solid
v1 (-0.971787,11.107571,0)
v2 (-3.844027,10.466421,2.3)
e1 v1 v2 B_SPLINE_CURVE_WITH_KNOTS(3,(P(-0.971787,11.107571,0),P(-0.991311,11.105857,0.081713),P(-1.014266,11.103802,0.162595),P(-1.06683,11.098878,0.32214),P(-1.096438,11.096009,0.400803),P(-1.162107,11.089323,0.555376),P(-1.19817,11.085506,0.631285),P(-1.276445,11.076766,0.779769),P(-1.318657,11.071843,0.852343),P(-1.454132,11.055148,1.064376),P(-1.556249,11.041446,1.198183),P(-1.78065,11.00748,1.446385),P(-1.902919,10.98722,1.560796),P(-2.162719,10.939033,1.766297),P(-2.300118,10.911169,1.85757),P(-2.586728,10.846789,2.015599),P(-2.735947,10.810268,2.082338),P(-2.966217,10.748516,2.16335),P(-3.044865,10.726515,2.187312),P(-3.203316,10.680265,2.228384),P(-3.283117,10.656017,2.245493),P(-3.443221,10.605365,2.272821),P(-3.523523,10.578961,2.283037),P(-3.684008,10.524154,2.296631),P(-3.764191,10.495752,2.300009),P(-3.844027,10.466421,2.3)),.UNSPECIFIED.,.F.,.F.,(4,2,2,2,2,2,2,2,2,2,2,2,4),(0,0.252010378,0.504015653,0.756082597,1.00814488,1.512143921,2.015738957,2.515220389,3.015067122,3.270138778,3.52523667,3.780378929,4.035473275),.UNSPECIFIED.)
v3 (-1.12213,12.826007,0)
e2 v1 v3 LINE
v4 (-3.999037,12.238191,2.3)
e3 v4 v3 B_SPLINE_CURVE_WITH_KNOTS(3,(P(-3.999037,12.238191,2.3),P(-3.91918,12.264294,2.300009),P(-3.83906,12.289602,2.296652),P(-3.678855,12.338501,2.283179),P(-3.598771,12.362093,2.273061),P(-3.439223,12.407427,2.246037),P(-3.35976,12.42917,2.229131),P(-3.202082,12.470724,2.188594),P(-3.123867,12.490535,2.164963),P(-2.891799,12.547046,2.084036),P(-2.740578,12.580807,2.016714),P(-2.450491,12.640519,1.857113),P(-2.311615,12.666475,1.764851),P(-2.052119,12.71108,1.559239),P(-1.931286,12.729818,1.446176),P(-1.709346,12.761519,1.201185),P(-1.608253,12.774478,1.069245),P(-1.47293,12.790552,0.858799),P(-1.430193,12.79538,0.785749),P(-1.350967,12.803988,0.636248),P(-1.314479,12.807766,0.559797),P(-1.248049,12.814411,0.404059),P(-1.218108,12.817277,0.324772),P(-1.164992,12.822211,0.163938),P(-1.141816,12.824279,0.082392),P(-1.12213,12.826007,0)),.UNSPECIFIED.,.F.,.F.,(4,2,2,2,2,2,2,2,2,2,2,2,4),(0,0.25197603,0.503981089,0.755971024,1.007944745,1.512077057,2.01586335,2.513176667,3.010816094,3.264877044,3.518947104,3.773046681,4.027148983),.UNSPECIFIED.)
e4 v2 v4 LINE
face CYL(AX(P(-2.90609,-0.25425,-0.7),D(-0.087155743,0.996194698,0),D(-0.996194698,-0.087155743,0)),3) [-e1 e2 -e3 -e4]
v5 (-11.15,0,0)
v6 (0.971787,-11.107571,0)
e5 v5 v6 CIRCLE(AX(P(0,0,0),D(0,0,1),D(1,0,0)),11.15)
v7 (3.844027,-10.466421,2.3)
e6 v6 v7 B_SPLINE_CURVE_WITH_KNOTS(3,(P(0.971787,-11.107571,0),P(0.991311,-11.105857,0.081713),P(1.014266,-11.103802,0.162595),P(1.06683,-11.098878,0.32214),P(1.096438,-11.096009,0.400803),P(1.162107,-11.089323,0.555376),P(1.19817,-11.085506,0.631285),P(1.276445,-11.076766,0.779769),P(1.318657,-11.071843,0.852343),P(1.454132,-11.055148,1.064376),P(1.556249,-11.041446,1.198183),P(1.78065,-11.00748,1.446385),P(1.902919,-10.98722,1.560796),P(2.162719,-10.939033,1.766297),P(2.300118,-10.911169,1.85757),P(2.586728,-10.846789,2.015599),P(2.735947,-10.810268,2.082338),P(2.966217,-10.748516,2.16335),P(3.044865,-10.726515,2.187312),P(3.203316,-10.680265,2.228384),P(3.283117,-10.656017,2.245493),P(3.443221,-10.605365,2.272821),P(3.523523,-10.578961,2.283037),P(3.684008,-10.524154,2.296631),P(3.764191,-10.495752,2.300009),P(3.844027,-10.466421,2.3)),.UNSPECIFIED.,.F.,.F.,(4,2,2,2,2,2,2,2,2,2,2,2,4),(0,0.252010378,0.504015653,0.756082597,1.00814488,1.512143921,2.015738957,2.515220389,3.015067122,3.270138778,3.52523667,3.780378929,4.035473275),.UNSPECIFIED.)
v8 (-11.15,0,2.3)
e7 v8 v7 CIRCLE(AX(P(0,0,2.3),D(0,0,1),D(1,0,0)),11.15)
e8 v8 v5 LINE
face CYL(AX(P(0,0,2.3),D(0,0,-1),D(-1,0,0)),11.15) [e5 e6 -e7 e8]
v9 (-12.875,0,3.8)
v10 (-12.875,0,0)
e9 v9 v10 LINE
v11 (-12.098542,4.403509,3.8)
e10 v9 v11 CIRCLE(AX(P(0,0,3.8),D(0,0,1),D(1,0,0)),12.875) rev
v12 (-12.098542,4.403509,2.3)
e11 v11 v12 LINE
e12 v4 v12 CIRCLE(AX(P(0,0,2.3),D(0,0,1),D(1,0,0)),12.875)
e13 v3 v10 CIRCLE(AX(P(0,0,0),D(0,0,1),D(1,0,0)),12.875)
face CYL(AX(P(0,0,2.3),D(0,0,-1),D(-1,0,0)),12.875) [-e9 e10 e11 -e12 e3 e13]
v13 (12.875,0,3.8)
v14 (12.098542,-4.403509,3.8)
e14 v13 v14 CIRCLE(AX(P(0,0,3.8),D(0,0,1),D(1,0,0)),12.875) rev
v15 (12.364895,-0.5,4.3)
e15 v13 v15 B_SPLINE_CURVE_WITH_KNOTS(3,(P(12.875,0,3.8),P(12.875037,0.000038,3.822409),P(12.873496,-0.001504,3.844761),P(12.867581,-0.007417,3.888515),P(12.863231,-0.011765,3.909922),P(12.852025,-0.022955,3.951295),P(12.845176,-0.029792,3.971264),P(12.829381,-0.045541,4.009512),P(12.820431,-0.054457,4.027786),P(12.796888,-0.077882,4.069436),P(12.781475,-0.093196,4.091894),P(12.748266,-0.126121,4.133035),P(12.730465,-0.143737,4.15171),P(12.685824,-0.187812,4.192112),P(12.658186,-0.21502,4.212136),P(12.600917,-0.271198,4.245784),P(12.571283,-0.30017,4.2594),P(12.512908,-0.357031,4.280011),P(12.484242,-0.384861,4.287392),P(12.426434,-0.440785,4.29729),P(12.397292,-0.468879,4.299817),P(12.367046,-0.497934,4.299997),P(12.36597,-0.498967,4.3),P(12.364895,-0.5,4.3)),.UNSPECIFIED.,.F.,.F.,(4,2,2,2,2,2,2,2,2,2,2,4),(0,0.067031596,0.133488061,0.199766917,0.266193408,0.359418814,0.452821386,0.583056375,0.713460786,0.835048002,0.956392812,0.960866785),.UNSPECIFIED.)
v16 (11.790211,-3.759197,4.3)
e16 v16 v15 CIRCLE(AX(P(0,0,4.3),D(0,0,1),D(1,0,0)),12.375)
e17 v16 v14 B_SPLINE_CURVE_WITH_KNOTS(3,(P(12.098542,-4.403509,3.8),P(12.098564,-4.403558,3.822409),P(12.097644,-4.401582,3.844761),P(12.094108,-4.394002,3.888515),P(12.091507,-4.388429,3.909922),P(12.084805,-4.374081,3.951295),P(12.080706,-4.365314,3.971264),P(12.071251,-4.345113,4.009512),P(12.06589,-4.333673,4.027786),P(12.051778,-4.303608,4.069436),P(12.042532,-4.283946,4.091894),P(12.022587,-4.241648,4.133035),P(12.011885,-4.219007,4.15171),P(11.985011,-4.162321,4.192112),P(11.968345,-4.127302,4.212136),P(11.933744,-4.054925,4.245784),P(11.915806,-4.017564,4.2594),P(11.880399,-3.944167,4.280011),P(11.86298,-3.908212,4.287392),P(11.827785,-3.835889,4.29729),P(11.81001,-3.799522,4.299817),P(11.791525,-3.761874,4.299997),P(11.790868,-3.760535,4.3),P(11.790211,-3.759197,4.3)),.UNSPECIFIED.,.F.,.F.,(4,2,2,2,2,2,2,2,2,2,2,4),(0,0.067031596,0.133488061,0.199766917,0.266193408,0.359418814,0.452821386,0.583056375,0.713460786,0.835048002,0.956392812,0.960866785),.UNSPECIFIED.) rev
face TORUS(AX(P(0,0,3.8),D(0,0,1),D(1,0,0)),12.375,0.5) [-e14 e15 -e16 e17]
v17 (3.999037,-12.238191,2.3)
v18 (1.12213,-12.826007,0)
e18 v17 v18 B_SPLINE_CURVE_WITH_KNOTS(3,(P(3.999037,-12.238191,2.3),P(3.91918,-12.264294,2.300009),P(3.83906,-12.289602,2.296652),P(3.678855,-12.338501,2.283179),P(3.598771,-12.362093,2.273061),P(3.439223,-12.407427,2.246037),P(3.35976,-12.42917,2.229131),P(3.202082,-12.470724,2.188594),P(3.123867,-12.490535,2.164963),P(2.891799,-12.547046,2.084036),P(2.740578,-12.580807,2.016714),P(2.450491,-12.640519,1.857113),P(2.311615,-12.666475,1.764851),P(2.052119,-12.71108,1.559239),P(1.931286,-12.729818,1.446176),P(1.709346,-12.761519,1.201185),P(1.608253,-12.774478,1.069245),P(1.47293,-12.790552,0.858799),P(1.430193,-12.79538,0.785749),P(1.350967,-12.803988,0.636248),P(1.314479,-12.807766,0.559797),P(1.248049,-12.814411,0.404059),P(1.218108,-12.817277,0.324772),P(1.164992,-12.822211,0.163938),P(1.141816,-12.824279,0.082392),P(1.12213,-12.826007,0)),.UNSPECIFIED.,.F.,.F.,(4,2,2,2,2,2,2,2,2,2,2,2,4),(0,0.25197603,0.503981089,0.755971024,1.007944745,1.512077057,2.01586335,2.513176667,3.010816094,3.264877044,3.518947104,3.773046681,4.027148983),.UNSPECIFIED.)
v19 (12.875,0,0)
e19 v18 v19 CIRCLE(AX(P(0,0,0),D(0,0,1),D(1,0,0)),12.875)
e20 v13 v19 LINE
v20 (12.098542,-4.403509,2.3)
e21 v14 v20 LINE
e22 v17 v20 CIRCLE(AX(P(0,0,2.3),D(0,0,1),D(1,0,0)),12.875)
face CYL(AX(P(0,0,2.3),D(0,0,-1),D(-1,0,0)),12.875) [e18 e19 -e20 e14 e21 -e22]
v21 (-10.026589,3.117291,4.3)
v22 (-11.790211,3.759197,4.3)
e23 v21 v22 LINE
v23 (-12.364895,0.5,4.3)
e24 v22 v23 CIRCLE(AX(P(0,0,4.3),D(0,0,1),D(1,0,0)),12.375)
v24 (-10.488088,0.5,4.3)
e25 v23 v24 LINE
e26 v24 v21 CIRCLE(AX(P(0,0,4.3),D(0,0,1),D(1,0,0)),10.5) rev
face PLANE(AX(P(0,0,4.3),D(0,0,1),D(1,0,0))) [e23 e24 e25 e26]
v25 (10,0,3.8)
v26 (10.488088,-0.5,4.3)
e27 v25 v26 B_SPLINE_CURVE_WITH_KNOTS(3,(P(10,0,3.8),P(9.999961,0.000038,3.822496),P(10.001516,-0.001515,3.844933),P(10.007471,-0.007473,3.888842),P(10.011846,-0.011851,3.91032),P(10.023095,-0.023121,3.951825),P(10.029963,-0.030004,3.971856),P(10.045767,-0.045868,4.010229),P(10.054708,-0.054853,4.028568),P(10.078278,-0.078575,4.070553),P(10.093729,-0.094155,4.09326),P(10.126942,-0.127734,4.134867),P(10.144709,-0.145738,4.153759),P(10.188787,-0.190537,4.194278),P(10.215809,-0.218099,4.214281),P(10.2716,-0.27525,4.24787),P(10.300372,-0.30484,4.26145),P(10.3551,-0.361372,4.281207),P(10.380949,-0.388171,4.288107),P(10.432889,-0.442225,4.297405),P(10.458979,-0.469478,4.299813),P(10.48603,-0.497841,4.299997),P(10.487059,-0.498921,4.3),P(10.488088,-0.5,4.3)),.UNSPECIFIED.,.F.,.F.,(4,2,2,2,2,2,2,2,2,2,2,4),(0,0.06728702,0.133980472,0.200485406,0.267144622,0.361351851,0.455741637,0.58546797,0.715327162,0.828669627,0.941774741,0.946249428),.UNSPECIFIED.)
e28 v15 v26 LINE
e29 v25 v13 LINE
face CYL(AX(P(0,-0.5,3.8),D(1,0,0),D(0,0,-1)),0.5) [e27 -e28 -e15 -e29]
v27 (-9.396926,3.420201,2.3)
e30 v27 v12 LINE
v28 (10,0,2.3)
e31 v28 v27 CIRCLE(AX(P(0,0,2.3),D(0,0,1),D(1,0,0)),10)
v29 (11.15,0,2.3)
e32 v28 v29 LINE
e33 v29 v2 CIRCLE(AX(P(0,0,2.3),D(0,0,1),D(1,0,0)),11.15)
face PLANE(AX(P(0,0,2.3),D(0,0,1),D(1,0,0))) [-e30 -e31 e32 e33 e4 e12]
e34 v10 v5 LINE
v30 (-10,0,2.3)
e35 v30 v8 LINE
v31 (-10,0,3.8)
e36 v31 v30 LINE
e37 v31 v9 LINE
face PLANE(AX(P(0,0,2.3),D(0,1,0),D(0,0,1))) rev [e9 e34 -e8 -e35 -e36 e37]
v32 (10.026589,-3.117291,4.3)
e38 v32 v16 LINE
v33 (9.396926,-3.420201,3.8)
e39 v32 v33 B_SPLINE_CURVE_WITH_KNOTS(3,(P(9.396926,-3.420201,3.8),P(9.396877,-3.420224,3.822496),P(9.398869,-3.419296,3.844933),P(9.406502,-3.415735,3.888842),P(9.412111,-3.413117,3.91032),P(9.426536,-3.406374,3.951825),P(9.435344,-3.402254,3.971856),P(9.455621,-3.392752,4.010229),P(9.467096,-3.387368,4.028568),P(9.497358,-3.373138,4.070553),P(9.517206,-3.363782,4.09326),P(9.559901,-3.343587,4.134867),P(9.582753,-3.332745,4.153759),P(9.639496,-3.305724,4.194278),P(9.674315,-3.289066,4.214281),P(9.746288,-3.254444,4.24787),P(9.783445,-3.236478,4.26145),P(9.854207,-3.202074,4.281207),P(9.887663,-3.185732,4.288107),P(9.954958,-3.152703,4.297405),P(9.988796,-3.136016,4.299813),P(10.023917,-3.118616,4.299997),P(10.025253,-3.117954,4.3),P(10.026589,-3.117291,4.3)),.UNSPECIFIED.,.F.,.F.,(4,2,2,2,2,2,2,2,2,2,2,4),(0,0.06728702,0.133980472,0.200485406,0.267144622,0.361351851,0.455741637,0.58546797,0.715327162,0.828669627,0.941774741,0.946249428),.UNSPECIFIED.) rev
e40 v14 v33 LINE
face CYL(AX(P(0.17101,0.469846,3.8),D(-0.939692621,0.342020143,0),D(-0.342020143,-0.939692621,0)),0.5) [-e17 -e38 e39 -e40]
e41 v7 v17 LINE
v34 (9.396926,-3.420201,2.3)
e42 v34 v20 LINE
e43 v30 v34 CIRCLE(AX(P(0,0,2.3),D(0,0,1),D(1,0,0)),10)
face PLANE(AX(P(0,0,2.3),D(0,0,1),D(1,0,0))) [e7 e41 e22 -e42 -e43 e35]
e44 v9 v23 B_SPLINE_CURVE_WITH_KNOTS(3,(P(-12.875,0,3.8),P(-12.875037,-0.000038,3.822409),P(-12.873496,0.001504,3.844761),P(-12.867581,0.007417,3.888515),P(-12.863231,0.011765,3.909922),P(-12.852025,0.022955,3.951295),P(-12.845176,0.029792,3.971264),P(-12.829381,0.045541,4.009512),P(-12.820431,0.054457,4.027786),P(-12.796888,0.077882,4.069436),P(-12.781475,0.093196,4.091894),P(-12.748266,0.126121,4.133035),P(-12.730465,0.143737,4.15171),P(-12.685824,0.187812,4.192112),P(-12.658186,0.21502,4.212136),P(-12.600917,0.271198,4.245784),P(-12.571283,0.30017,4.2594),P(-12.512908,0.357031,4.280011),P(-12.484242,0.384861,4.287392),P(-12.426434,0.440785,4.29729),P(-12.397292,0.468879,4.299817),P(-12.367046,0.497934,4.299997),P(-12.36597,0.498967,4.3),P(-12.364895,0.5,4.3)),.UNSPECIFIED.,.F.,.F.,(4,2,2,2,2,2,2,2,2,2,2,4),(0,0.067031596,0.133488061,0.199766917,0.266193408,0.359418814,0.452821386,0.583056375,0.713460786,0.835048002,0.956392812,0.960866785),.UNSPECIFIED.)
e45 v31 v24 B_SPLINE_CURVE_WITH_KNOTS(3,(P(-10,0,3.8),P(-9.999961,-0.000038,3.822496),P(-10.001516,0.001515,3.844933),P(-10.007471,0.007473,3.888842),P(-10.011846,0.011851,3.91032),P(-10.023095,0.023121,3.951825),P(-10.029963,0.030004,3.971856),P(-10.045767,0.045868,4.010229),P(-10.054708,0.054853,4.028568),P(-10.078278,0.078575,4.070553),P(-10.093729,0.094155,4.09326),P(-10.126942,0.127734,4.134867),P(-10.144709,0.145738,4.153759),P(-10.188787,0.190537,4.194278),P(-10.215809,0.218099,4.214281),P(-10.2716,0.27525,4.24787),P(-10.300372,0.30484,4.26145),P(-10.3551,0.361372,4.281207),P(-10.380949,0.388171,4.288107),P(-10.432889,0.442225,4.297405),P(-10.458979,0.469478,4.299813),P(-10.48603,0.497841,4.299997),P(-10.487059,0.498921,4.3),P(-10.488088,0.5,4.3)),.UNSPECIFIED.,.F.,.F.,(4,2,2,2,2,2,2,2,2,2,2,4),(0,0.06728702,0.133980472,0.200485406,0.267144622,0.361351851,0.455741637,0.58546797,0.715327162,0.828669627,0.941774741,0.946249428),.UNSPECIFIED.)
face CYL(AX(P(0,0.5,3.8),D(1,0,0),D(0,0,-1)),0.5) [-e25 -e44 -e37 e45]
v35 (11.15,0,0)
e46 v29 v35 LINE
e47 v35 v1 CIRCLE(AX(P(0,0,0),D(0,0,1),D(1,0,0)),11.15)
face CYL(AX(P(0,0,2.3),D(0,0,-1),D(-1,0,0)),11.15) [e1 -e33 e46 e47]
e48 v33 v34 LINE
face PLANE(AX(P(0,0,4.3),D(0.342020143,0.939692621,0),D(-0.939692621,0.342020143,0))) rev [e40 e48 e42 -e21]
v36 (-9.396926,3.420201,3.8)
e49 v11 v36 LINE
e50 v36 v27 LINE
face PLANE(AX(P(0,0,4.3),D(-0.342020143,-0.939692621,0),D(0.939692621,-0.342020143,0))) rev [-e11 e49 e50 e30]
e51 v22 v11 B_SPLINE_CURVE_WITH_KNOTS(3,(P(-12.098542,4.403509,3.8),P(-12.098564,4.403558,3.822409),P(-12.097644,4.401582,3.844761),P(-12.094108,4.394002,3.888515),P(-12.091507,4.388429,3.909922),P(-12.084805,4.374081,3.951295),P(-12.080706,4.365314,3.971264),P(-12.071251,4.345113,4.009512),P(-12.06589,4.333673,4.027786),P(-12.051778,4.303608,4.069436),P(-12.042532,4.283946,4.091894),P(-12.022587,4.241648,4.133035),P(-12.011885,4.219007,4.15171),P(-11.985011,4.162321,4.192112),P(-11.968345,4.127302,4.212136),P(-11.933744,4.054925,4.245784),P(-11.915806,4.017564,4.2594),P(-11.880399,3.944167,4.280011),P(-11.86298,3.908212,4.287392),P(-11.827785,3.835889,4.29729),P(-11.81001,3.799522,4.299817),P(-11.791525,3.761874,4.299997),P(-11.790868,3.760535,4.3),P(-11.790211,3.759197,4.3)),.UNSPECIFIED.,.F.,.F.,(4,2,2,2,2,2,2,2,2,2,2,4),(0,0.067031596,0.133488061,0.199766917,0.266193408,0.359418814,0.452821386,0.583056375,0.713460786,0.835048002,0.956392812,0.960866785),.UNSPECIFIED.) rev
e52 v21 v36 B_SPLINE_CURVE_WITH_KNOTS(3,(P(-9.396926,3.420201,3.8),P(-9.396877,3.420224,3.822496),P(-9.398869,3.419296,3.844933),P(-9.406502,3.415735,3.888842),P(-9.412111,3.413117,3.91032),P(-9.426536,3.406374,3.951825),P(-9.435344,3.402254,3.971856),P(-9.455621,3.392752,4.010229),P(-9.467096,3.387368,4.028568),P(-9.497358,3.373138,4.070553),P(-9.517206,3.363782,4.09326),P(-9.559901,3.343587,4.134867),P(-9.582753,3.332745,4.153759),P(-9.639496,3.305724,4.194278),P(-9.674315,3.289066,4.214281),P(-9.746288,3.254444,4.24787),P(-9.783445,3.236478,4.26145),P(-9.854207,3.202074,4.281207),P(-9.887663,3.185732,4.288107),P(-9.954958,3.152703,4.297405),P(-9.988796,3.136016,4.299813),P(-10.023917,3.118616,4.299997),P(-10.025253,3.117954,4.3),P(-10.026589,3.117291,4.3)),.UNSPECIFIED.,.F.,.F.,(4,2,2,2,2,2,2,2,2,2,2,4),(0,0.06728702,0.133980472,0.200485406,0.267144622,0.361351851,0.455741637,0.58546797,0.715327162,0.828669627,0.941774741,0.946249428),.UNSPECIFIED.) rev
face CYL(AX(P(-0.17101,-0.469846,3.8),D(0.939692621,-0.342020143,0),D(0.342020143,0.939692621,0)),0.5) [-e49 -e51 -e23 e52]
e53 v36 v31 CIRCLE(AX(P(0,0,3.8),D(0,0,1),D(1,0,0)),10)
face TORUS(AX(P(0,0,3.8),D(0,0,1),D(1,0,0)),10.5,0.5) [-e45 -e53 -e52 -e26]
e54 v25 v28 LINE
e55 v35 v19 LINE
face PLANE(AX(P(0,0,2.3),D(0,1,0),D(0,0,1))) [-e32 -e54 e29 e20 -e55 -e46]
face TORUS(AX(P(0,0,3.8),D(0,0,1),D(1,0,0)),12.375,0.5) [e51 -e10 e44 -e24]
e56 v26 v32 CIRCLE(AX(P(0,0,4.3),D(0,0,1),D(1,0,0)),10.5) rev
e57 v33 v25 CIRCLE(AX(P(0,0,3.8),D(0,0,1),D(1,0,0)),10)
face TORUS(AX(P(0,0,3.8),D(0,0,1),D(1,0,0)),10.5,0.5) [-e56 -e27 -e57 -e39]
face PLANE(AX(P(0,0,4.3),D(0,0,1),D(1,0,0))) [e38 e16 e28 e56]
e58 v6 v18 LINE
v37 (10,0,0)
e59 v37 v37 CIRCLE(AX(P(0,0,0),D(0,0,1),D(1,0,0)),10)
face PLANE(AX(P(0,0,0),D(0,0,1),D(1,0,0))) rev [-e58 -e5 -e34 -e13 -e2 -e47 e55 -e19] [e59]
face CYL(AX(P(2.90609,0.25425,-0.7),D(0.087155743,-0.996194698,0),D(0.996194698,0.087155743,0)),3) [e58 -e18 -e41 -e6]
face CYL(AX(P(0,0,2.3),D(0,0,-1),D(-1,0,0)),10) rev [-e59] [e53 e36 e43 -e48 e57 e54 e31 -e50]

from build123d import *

# Parameters (mm, degrees)
BOSS_EXTRUDE1_DEPTH = 2.3
FILLET1_R           = 3
BOSS_EXTRUDE2_DEPTH = 2
FILLET2_R           = 0.5


with BuildPart() as part:
    # Sketch2 → Boss-Extrude1 (new body)
    with BuildSketch(Plane.XY):
        with BuildLine():
            ThreePointArc((-11.15, 0), (-8.220642305, 7.532830815), (-0.971786532, 11.107570884))
            Line((-0.971786532, 11.107570884), (-1.122130188, 12.826006738))
            ThreePointArc((-1.122130188, 12.826006738), (-9.492445711, 8.698223923), (-12.875, 0))
            Line((-12.875, 0), (-11.15, 0))
        make_face()
        with BuildLine():
            ThreePointArc((-10, 0), (-7.372773368, 6.755902076), (-0.871557427, 9.961946981))
            Line((-0.871557427, 9.961946981), (-0.971786532, 11.107570884))
            ThreePointArc((-0.971786532, 11.107570884), (-8.220642305, 7.532830815), (-11.15, 0))
            Line((-11.15, 0), (-10, 0))
        make_face()
        with BuildLine():
            Line((-0.971786532, 11.107570884), (-0.871557427, 9.961946981))
            ThreePointArc((-0.871557427, 9.961946981), (6.755902076, 7.372773368), (10, 0))
            Line((10, 0), (11.15, 0))
            ThreePointArc((11.15, 0), (10.885700479, 2.413301695), (10.105331825, 4.712193618))
            ThreePointArc((10.105331825, 4.712193618), (5.575, 9.656183252), (-0.971786532, 11.107570884))
        make_face()
        with BuildLine():
            ThreePointArc((10, 0), (7.372773368, -6.755902076), (0.871557427, -9.961946981))
            Line((0.871557427, -9.961946981), (0.971786532, -11.107570884))
            ThreePointArc((0.971786532, -11.107570884), (8.220642305, -7.532830815), (11.15, 0))
            Line((11.15, 0), (10, 0))
        make_face()
        with BuildLine():
            Line((0.971786532, -11.107570884), (0.871557427, -9.961946981))
            ThreePointArc((0.871557427, -9.961946981), (-6.755902076, -7.372773368), (-10, 0))
            Line((-10, 0), (-11.15, 0))
            ThreePointArc((-11.15, 0), (-7.532830815, -8.220642305), (0.971786532, -11.107570884))
        make_face()
        with BuildLine():
            ThreePointArc((11.15, 0), (8.220642305, -7.532830815), (0.971786532, -11.107570884))
            Line((0.971786532, -11.107570884), (1.122130188, -12.826006738))
            ThreePointArc((1.122130188, -12.826006738), (9.492445711, -8.698223923), (12.875, 0))
            Line((12.875, 0), (11.15, 0))
        make_face()
    extrude(amount=BOSS_EXTRUDE1_DEPTH)

    # Fillet1
    # the kernel refuses this fillet: 3 mm, written as the material it takes off along each edge
    with BuildSketch(Plane(origin=(-1.757754934, 20.091230835, 2.3), x_dir=(0, 0, -1), z_dir=(0.08715574274757223, -0.9961946980917531, 0))) as fillet1_piece_1_section:
        with BuildLine():
            CenterArc((3, -2.917190429), FILLET1_R, 103.493398822, 76.506601178)
            Line((0, -2.917190429), (0, 0))
            Line((0, 0), (2.3, 0))
        make_face()
    fillet1_piece_1 = extrude(amount=16.310952146, mode=Mode.PRIVATE)
    fillet1_piece_1 = fillet1_piece_1 - Plane(origin=(0, 0, 1.660555485), x_dir=(1, 0, 0), z_dir=(0, 0, -1)) * Cylinder(11.15, 45, mode=Mode.PRIVATE)
    add(fillet1_piece_1, mode=Mode.SUBTRACT)
    with BuildSketch(Plane(origin=(0.336161785, -3.842346787, 2.3), x_dir=(0.9961946980917454, 0.08715574274765826, 0), z_dir=(0.08715574274765828, -0.9961946980917455, 0))) as fillet1_piece_2_section:
        with BuildLine():
            CenterArc((2.917190429, -3), FILLET1_R, 90, 76.506601178)
            Line((0, -2.3), (0, 0))
            Line((0, 0), (2.917190429, 0))
        make_face()
    fillet1_piece_2 = extrude(amount=16.310952146, mode=Mode.PRIVATE)
    fillet1_piece_2 = fillet1_piece_2 - Plane(origin=(0, 0, 1.660555485), x_dir=(1, 0, 0), z_dir=(0, 0, -1)) * Cylinder(11.15, 45, mode=Mode.PRIVATE)
    add(fillet1_piece_2, mode=Mode.SUBTRACT)

    # Sketch3 → Boss-Extrude2 (add)
    with BuildSketch(Plane.XY.offset(2.3)):
        with BuildLine():
            ThreePointArc((-10, 0), (-9.84807753, 1.736481777), (-9.396926208, 3.420201433))
            Line((-9.396926208, 3.420201433), (-12.098542493, 4.403509345))
            ThreePointArc((-12.098542493, 4.403509345), (-12.67939982, 2.235720287), (-12.875, 0))
            Line((-12.875, 0), (-11.15, 0))
            Line((-11.15, 0), (-10, 0))
        make_face()
        with BuildLine():
            ThreePointArc((10, 0), (9.84807753, -1.736481777), (9.396926208, -3.420201433))
            Line((9.396926208, -3.420201433), (12.098542493, -4.403509345))
            ThreePointArc((12.098542493, -4.403509345), (12.67939982, -2.235720287), (12.875, 0))
            Line((12.875, 0), (11.15, 0))
            Line((11.15, 0), (10, 0))
        make_face()
    extrude(amount=BOSS_EXTRUDE2_DEPTH)

    # Fillet2
    fillet2_edges = [part.edges().sort_by_distance(p)[0] for p in [
        (-11.4375, 0, 4.3),
        (-9.84807753, 1.736481777, 4.3),
        (-10.74773435, 3.911855389, 4.3),
        (-12.67939982, 2.235720287, 4.3),
        (11.4375, 0, 4.3),
        (9.84807753, -1.736481777, 4.3),
        (10.74773435, -3.911855389, 4.3),
        (12.67939982, -2.235720287, 4.3),
    ]]
    fillet(fillet2_edges, radius=FILLET2_R)


solid = part.part
